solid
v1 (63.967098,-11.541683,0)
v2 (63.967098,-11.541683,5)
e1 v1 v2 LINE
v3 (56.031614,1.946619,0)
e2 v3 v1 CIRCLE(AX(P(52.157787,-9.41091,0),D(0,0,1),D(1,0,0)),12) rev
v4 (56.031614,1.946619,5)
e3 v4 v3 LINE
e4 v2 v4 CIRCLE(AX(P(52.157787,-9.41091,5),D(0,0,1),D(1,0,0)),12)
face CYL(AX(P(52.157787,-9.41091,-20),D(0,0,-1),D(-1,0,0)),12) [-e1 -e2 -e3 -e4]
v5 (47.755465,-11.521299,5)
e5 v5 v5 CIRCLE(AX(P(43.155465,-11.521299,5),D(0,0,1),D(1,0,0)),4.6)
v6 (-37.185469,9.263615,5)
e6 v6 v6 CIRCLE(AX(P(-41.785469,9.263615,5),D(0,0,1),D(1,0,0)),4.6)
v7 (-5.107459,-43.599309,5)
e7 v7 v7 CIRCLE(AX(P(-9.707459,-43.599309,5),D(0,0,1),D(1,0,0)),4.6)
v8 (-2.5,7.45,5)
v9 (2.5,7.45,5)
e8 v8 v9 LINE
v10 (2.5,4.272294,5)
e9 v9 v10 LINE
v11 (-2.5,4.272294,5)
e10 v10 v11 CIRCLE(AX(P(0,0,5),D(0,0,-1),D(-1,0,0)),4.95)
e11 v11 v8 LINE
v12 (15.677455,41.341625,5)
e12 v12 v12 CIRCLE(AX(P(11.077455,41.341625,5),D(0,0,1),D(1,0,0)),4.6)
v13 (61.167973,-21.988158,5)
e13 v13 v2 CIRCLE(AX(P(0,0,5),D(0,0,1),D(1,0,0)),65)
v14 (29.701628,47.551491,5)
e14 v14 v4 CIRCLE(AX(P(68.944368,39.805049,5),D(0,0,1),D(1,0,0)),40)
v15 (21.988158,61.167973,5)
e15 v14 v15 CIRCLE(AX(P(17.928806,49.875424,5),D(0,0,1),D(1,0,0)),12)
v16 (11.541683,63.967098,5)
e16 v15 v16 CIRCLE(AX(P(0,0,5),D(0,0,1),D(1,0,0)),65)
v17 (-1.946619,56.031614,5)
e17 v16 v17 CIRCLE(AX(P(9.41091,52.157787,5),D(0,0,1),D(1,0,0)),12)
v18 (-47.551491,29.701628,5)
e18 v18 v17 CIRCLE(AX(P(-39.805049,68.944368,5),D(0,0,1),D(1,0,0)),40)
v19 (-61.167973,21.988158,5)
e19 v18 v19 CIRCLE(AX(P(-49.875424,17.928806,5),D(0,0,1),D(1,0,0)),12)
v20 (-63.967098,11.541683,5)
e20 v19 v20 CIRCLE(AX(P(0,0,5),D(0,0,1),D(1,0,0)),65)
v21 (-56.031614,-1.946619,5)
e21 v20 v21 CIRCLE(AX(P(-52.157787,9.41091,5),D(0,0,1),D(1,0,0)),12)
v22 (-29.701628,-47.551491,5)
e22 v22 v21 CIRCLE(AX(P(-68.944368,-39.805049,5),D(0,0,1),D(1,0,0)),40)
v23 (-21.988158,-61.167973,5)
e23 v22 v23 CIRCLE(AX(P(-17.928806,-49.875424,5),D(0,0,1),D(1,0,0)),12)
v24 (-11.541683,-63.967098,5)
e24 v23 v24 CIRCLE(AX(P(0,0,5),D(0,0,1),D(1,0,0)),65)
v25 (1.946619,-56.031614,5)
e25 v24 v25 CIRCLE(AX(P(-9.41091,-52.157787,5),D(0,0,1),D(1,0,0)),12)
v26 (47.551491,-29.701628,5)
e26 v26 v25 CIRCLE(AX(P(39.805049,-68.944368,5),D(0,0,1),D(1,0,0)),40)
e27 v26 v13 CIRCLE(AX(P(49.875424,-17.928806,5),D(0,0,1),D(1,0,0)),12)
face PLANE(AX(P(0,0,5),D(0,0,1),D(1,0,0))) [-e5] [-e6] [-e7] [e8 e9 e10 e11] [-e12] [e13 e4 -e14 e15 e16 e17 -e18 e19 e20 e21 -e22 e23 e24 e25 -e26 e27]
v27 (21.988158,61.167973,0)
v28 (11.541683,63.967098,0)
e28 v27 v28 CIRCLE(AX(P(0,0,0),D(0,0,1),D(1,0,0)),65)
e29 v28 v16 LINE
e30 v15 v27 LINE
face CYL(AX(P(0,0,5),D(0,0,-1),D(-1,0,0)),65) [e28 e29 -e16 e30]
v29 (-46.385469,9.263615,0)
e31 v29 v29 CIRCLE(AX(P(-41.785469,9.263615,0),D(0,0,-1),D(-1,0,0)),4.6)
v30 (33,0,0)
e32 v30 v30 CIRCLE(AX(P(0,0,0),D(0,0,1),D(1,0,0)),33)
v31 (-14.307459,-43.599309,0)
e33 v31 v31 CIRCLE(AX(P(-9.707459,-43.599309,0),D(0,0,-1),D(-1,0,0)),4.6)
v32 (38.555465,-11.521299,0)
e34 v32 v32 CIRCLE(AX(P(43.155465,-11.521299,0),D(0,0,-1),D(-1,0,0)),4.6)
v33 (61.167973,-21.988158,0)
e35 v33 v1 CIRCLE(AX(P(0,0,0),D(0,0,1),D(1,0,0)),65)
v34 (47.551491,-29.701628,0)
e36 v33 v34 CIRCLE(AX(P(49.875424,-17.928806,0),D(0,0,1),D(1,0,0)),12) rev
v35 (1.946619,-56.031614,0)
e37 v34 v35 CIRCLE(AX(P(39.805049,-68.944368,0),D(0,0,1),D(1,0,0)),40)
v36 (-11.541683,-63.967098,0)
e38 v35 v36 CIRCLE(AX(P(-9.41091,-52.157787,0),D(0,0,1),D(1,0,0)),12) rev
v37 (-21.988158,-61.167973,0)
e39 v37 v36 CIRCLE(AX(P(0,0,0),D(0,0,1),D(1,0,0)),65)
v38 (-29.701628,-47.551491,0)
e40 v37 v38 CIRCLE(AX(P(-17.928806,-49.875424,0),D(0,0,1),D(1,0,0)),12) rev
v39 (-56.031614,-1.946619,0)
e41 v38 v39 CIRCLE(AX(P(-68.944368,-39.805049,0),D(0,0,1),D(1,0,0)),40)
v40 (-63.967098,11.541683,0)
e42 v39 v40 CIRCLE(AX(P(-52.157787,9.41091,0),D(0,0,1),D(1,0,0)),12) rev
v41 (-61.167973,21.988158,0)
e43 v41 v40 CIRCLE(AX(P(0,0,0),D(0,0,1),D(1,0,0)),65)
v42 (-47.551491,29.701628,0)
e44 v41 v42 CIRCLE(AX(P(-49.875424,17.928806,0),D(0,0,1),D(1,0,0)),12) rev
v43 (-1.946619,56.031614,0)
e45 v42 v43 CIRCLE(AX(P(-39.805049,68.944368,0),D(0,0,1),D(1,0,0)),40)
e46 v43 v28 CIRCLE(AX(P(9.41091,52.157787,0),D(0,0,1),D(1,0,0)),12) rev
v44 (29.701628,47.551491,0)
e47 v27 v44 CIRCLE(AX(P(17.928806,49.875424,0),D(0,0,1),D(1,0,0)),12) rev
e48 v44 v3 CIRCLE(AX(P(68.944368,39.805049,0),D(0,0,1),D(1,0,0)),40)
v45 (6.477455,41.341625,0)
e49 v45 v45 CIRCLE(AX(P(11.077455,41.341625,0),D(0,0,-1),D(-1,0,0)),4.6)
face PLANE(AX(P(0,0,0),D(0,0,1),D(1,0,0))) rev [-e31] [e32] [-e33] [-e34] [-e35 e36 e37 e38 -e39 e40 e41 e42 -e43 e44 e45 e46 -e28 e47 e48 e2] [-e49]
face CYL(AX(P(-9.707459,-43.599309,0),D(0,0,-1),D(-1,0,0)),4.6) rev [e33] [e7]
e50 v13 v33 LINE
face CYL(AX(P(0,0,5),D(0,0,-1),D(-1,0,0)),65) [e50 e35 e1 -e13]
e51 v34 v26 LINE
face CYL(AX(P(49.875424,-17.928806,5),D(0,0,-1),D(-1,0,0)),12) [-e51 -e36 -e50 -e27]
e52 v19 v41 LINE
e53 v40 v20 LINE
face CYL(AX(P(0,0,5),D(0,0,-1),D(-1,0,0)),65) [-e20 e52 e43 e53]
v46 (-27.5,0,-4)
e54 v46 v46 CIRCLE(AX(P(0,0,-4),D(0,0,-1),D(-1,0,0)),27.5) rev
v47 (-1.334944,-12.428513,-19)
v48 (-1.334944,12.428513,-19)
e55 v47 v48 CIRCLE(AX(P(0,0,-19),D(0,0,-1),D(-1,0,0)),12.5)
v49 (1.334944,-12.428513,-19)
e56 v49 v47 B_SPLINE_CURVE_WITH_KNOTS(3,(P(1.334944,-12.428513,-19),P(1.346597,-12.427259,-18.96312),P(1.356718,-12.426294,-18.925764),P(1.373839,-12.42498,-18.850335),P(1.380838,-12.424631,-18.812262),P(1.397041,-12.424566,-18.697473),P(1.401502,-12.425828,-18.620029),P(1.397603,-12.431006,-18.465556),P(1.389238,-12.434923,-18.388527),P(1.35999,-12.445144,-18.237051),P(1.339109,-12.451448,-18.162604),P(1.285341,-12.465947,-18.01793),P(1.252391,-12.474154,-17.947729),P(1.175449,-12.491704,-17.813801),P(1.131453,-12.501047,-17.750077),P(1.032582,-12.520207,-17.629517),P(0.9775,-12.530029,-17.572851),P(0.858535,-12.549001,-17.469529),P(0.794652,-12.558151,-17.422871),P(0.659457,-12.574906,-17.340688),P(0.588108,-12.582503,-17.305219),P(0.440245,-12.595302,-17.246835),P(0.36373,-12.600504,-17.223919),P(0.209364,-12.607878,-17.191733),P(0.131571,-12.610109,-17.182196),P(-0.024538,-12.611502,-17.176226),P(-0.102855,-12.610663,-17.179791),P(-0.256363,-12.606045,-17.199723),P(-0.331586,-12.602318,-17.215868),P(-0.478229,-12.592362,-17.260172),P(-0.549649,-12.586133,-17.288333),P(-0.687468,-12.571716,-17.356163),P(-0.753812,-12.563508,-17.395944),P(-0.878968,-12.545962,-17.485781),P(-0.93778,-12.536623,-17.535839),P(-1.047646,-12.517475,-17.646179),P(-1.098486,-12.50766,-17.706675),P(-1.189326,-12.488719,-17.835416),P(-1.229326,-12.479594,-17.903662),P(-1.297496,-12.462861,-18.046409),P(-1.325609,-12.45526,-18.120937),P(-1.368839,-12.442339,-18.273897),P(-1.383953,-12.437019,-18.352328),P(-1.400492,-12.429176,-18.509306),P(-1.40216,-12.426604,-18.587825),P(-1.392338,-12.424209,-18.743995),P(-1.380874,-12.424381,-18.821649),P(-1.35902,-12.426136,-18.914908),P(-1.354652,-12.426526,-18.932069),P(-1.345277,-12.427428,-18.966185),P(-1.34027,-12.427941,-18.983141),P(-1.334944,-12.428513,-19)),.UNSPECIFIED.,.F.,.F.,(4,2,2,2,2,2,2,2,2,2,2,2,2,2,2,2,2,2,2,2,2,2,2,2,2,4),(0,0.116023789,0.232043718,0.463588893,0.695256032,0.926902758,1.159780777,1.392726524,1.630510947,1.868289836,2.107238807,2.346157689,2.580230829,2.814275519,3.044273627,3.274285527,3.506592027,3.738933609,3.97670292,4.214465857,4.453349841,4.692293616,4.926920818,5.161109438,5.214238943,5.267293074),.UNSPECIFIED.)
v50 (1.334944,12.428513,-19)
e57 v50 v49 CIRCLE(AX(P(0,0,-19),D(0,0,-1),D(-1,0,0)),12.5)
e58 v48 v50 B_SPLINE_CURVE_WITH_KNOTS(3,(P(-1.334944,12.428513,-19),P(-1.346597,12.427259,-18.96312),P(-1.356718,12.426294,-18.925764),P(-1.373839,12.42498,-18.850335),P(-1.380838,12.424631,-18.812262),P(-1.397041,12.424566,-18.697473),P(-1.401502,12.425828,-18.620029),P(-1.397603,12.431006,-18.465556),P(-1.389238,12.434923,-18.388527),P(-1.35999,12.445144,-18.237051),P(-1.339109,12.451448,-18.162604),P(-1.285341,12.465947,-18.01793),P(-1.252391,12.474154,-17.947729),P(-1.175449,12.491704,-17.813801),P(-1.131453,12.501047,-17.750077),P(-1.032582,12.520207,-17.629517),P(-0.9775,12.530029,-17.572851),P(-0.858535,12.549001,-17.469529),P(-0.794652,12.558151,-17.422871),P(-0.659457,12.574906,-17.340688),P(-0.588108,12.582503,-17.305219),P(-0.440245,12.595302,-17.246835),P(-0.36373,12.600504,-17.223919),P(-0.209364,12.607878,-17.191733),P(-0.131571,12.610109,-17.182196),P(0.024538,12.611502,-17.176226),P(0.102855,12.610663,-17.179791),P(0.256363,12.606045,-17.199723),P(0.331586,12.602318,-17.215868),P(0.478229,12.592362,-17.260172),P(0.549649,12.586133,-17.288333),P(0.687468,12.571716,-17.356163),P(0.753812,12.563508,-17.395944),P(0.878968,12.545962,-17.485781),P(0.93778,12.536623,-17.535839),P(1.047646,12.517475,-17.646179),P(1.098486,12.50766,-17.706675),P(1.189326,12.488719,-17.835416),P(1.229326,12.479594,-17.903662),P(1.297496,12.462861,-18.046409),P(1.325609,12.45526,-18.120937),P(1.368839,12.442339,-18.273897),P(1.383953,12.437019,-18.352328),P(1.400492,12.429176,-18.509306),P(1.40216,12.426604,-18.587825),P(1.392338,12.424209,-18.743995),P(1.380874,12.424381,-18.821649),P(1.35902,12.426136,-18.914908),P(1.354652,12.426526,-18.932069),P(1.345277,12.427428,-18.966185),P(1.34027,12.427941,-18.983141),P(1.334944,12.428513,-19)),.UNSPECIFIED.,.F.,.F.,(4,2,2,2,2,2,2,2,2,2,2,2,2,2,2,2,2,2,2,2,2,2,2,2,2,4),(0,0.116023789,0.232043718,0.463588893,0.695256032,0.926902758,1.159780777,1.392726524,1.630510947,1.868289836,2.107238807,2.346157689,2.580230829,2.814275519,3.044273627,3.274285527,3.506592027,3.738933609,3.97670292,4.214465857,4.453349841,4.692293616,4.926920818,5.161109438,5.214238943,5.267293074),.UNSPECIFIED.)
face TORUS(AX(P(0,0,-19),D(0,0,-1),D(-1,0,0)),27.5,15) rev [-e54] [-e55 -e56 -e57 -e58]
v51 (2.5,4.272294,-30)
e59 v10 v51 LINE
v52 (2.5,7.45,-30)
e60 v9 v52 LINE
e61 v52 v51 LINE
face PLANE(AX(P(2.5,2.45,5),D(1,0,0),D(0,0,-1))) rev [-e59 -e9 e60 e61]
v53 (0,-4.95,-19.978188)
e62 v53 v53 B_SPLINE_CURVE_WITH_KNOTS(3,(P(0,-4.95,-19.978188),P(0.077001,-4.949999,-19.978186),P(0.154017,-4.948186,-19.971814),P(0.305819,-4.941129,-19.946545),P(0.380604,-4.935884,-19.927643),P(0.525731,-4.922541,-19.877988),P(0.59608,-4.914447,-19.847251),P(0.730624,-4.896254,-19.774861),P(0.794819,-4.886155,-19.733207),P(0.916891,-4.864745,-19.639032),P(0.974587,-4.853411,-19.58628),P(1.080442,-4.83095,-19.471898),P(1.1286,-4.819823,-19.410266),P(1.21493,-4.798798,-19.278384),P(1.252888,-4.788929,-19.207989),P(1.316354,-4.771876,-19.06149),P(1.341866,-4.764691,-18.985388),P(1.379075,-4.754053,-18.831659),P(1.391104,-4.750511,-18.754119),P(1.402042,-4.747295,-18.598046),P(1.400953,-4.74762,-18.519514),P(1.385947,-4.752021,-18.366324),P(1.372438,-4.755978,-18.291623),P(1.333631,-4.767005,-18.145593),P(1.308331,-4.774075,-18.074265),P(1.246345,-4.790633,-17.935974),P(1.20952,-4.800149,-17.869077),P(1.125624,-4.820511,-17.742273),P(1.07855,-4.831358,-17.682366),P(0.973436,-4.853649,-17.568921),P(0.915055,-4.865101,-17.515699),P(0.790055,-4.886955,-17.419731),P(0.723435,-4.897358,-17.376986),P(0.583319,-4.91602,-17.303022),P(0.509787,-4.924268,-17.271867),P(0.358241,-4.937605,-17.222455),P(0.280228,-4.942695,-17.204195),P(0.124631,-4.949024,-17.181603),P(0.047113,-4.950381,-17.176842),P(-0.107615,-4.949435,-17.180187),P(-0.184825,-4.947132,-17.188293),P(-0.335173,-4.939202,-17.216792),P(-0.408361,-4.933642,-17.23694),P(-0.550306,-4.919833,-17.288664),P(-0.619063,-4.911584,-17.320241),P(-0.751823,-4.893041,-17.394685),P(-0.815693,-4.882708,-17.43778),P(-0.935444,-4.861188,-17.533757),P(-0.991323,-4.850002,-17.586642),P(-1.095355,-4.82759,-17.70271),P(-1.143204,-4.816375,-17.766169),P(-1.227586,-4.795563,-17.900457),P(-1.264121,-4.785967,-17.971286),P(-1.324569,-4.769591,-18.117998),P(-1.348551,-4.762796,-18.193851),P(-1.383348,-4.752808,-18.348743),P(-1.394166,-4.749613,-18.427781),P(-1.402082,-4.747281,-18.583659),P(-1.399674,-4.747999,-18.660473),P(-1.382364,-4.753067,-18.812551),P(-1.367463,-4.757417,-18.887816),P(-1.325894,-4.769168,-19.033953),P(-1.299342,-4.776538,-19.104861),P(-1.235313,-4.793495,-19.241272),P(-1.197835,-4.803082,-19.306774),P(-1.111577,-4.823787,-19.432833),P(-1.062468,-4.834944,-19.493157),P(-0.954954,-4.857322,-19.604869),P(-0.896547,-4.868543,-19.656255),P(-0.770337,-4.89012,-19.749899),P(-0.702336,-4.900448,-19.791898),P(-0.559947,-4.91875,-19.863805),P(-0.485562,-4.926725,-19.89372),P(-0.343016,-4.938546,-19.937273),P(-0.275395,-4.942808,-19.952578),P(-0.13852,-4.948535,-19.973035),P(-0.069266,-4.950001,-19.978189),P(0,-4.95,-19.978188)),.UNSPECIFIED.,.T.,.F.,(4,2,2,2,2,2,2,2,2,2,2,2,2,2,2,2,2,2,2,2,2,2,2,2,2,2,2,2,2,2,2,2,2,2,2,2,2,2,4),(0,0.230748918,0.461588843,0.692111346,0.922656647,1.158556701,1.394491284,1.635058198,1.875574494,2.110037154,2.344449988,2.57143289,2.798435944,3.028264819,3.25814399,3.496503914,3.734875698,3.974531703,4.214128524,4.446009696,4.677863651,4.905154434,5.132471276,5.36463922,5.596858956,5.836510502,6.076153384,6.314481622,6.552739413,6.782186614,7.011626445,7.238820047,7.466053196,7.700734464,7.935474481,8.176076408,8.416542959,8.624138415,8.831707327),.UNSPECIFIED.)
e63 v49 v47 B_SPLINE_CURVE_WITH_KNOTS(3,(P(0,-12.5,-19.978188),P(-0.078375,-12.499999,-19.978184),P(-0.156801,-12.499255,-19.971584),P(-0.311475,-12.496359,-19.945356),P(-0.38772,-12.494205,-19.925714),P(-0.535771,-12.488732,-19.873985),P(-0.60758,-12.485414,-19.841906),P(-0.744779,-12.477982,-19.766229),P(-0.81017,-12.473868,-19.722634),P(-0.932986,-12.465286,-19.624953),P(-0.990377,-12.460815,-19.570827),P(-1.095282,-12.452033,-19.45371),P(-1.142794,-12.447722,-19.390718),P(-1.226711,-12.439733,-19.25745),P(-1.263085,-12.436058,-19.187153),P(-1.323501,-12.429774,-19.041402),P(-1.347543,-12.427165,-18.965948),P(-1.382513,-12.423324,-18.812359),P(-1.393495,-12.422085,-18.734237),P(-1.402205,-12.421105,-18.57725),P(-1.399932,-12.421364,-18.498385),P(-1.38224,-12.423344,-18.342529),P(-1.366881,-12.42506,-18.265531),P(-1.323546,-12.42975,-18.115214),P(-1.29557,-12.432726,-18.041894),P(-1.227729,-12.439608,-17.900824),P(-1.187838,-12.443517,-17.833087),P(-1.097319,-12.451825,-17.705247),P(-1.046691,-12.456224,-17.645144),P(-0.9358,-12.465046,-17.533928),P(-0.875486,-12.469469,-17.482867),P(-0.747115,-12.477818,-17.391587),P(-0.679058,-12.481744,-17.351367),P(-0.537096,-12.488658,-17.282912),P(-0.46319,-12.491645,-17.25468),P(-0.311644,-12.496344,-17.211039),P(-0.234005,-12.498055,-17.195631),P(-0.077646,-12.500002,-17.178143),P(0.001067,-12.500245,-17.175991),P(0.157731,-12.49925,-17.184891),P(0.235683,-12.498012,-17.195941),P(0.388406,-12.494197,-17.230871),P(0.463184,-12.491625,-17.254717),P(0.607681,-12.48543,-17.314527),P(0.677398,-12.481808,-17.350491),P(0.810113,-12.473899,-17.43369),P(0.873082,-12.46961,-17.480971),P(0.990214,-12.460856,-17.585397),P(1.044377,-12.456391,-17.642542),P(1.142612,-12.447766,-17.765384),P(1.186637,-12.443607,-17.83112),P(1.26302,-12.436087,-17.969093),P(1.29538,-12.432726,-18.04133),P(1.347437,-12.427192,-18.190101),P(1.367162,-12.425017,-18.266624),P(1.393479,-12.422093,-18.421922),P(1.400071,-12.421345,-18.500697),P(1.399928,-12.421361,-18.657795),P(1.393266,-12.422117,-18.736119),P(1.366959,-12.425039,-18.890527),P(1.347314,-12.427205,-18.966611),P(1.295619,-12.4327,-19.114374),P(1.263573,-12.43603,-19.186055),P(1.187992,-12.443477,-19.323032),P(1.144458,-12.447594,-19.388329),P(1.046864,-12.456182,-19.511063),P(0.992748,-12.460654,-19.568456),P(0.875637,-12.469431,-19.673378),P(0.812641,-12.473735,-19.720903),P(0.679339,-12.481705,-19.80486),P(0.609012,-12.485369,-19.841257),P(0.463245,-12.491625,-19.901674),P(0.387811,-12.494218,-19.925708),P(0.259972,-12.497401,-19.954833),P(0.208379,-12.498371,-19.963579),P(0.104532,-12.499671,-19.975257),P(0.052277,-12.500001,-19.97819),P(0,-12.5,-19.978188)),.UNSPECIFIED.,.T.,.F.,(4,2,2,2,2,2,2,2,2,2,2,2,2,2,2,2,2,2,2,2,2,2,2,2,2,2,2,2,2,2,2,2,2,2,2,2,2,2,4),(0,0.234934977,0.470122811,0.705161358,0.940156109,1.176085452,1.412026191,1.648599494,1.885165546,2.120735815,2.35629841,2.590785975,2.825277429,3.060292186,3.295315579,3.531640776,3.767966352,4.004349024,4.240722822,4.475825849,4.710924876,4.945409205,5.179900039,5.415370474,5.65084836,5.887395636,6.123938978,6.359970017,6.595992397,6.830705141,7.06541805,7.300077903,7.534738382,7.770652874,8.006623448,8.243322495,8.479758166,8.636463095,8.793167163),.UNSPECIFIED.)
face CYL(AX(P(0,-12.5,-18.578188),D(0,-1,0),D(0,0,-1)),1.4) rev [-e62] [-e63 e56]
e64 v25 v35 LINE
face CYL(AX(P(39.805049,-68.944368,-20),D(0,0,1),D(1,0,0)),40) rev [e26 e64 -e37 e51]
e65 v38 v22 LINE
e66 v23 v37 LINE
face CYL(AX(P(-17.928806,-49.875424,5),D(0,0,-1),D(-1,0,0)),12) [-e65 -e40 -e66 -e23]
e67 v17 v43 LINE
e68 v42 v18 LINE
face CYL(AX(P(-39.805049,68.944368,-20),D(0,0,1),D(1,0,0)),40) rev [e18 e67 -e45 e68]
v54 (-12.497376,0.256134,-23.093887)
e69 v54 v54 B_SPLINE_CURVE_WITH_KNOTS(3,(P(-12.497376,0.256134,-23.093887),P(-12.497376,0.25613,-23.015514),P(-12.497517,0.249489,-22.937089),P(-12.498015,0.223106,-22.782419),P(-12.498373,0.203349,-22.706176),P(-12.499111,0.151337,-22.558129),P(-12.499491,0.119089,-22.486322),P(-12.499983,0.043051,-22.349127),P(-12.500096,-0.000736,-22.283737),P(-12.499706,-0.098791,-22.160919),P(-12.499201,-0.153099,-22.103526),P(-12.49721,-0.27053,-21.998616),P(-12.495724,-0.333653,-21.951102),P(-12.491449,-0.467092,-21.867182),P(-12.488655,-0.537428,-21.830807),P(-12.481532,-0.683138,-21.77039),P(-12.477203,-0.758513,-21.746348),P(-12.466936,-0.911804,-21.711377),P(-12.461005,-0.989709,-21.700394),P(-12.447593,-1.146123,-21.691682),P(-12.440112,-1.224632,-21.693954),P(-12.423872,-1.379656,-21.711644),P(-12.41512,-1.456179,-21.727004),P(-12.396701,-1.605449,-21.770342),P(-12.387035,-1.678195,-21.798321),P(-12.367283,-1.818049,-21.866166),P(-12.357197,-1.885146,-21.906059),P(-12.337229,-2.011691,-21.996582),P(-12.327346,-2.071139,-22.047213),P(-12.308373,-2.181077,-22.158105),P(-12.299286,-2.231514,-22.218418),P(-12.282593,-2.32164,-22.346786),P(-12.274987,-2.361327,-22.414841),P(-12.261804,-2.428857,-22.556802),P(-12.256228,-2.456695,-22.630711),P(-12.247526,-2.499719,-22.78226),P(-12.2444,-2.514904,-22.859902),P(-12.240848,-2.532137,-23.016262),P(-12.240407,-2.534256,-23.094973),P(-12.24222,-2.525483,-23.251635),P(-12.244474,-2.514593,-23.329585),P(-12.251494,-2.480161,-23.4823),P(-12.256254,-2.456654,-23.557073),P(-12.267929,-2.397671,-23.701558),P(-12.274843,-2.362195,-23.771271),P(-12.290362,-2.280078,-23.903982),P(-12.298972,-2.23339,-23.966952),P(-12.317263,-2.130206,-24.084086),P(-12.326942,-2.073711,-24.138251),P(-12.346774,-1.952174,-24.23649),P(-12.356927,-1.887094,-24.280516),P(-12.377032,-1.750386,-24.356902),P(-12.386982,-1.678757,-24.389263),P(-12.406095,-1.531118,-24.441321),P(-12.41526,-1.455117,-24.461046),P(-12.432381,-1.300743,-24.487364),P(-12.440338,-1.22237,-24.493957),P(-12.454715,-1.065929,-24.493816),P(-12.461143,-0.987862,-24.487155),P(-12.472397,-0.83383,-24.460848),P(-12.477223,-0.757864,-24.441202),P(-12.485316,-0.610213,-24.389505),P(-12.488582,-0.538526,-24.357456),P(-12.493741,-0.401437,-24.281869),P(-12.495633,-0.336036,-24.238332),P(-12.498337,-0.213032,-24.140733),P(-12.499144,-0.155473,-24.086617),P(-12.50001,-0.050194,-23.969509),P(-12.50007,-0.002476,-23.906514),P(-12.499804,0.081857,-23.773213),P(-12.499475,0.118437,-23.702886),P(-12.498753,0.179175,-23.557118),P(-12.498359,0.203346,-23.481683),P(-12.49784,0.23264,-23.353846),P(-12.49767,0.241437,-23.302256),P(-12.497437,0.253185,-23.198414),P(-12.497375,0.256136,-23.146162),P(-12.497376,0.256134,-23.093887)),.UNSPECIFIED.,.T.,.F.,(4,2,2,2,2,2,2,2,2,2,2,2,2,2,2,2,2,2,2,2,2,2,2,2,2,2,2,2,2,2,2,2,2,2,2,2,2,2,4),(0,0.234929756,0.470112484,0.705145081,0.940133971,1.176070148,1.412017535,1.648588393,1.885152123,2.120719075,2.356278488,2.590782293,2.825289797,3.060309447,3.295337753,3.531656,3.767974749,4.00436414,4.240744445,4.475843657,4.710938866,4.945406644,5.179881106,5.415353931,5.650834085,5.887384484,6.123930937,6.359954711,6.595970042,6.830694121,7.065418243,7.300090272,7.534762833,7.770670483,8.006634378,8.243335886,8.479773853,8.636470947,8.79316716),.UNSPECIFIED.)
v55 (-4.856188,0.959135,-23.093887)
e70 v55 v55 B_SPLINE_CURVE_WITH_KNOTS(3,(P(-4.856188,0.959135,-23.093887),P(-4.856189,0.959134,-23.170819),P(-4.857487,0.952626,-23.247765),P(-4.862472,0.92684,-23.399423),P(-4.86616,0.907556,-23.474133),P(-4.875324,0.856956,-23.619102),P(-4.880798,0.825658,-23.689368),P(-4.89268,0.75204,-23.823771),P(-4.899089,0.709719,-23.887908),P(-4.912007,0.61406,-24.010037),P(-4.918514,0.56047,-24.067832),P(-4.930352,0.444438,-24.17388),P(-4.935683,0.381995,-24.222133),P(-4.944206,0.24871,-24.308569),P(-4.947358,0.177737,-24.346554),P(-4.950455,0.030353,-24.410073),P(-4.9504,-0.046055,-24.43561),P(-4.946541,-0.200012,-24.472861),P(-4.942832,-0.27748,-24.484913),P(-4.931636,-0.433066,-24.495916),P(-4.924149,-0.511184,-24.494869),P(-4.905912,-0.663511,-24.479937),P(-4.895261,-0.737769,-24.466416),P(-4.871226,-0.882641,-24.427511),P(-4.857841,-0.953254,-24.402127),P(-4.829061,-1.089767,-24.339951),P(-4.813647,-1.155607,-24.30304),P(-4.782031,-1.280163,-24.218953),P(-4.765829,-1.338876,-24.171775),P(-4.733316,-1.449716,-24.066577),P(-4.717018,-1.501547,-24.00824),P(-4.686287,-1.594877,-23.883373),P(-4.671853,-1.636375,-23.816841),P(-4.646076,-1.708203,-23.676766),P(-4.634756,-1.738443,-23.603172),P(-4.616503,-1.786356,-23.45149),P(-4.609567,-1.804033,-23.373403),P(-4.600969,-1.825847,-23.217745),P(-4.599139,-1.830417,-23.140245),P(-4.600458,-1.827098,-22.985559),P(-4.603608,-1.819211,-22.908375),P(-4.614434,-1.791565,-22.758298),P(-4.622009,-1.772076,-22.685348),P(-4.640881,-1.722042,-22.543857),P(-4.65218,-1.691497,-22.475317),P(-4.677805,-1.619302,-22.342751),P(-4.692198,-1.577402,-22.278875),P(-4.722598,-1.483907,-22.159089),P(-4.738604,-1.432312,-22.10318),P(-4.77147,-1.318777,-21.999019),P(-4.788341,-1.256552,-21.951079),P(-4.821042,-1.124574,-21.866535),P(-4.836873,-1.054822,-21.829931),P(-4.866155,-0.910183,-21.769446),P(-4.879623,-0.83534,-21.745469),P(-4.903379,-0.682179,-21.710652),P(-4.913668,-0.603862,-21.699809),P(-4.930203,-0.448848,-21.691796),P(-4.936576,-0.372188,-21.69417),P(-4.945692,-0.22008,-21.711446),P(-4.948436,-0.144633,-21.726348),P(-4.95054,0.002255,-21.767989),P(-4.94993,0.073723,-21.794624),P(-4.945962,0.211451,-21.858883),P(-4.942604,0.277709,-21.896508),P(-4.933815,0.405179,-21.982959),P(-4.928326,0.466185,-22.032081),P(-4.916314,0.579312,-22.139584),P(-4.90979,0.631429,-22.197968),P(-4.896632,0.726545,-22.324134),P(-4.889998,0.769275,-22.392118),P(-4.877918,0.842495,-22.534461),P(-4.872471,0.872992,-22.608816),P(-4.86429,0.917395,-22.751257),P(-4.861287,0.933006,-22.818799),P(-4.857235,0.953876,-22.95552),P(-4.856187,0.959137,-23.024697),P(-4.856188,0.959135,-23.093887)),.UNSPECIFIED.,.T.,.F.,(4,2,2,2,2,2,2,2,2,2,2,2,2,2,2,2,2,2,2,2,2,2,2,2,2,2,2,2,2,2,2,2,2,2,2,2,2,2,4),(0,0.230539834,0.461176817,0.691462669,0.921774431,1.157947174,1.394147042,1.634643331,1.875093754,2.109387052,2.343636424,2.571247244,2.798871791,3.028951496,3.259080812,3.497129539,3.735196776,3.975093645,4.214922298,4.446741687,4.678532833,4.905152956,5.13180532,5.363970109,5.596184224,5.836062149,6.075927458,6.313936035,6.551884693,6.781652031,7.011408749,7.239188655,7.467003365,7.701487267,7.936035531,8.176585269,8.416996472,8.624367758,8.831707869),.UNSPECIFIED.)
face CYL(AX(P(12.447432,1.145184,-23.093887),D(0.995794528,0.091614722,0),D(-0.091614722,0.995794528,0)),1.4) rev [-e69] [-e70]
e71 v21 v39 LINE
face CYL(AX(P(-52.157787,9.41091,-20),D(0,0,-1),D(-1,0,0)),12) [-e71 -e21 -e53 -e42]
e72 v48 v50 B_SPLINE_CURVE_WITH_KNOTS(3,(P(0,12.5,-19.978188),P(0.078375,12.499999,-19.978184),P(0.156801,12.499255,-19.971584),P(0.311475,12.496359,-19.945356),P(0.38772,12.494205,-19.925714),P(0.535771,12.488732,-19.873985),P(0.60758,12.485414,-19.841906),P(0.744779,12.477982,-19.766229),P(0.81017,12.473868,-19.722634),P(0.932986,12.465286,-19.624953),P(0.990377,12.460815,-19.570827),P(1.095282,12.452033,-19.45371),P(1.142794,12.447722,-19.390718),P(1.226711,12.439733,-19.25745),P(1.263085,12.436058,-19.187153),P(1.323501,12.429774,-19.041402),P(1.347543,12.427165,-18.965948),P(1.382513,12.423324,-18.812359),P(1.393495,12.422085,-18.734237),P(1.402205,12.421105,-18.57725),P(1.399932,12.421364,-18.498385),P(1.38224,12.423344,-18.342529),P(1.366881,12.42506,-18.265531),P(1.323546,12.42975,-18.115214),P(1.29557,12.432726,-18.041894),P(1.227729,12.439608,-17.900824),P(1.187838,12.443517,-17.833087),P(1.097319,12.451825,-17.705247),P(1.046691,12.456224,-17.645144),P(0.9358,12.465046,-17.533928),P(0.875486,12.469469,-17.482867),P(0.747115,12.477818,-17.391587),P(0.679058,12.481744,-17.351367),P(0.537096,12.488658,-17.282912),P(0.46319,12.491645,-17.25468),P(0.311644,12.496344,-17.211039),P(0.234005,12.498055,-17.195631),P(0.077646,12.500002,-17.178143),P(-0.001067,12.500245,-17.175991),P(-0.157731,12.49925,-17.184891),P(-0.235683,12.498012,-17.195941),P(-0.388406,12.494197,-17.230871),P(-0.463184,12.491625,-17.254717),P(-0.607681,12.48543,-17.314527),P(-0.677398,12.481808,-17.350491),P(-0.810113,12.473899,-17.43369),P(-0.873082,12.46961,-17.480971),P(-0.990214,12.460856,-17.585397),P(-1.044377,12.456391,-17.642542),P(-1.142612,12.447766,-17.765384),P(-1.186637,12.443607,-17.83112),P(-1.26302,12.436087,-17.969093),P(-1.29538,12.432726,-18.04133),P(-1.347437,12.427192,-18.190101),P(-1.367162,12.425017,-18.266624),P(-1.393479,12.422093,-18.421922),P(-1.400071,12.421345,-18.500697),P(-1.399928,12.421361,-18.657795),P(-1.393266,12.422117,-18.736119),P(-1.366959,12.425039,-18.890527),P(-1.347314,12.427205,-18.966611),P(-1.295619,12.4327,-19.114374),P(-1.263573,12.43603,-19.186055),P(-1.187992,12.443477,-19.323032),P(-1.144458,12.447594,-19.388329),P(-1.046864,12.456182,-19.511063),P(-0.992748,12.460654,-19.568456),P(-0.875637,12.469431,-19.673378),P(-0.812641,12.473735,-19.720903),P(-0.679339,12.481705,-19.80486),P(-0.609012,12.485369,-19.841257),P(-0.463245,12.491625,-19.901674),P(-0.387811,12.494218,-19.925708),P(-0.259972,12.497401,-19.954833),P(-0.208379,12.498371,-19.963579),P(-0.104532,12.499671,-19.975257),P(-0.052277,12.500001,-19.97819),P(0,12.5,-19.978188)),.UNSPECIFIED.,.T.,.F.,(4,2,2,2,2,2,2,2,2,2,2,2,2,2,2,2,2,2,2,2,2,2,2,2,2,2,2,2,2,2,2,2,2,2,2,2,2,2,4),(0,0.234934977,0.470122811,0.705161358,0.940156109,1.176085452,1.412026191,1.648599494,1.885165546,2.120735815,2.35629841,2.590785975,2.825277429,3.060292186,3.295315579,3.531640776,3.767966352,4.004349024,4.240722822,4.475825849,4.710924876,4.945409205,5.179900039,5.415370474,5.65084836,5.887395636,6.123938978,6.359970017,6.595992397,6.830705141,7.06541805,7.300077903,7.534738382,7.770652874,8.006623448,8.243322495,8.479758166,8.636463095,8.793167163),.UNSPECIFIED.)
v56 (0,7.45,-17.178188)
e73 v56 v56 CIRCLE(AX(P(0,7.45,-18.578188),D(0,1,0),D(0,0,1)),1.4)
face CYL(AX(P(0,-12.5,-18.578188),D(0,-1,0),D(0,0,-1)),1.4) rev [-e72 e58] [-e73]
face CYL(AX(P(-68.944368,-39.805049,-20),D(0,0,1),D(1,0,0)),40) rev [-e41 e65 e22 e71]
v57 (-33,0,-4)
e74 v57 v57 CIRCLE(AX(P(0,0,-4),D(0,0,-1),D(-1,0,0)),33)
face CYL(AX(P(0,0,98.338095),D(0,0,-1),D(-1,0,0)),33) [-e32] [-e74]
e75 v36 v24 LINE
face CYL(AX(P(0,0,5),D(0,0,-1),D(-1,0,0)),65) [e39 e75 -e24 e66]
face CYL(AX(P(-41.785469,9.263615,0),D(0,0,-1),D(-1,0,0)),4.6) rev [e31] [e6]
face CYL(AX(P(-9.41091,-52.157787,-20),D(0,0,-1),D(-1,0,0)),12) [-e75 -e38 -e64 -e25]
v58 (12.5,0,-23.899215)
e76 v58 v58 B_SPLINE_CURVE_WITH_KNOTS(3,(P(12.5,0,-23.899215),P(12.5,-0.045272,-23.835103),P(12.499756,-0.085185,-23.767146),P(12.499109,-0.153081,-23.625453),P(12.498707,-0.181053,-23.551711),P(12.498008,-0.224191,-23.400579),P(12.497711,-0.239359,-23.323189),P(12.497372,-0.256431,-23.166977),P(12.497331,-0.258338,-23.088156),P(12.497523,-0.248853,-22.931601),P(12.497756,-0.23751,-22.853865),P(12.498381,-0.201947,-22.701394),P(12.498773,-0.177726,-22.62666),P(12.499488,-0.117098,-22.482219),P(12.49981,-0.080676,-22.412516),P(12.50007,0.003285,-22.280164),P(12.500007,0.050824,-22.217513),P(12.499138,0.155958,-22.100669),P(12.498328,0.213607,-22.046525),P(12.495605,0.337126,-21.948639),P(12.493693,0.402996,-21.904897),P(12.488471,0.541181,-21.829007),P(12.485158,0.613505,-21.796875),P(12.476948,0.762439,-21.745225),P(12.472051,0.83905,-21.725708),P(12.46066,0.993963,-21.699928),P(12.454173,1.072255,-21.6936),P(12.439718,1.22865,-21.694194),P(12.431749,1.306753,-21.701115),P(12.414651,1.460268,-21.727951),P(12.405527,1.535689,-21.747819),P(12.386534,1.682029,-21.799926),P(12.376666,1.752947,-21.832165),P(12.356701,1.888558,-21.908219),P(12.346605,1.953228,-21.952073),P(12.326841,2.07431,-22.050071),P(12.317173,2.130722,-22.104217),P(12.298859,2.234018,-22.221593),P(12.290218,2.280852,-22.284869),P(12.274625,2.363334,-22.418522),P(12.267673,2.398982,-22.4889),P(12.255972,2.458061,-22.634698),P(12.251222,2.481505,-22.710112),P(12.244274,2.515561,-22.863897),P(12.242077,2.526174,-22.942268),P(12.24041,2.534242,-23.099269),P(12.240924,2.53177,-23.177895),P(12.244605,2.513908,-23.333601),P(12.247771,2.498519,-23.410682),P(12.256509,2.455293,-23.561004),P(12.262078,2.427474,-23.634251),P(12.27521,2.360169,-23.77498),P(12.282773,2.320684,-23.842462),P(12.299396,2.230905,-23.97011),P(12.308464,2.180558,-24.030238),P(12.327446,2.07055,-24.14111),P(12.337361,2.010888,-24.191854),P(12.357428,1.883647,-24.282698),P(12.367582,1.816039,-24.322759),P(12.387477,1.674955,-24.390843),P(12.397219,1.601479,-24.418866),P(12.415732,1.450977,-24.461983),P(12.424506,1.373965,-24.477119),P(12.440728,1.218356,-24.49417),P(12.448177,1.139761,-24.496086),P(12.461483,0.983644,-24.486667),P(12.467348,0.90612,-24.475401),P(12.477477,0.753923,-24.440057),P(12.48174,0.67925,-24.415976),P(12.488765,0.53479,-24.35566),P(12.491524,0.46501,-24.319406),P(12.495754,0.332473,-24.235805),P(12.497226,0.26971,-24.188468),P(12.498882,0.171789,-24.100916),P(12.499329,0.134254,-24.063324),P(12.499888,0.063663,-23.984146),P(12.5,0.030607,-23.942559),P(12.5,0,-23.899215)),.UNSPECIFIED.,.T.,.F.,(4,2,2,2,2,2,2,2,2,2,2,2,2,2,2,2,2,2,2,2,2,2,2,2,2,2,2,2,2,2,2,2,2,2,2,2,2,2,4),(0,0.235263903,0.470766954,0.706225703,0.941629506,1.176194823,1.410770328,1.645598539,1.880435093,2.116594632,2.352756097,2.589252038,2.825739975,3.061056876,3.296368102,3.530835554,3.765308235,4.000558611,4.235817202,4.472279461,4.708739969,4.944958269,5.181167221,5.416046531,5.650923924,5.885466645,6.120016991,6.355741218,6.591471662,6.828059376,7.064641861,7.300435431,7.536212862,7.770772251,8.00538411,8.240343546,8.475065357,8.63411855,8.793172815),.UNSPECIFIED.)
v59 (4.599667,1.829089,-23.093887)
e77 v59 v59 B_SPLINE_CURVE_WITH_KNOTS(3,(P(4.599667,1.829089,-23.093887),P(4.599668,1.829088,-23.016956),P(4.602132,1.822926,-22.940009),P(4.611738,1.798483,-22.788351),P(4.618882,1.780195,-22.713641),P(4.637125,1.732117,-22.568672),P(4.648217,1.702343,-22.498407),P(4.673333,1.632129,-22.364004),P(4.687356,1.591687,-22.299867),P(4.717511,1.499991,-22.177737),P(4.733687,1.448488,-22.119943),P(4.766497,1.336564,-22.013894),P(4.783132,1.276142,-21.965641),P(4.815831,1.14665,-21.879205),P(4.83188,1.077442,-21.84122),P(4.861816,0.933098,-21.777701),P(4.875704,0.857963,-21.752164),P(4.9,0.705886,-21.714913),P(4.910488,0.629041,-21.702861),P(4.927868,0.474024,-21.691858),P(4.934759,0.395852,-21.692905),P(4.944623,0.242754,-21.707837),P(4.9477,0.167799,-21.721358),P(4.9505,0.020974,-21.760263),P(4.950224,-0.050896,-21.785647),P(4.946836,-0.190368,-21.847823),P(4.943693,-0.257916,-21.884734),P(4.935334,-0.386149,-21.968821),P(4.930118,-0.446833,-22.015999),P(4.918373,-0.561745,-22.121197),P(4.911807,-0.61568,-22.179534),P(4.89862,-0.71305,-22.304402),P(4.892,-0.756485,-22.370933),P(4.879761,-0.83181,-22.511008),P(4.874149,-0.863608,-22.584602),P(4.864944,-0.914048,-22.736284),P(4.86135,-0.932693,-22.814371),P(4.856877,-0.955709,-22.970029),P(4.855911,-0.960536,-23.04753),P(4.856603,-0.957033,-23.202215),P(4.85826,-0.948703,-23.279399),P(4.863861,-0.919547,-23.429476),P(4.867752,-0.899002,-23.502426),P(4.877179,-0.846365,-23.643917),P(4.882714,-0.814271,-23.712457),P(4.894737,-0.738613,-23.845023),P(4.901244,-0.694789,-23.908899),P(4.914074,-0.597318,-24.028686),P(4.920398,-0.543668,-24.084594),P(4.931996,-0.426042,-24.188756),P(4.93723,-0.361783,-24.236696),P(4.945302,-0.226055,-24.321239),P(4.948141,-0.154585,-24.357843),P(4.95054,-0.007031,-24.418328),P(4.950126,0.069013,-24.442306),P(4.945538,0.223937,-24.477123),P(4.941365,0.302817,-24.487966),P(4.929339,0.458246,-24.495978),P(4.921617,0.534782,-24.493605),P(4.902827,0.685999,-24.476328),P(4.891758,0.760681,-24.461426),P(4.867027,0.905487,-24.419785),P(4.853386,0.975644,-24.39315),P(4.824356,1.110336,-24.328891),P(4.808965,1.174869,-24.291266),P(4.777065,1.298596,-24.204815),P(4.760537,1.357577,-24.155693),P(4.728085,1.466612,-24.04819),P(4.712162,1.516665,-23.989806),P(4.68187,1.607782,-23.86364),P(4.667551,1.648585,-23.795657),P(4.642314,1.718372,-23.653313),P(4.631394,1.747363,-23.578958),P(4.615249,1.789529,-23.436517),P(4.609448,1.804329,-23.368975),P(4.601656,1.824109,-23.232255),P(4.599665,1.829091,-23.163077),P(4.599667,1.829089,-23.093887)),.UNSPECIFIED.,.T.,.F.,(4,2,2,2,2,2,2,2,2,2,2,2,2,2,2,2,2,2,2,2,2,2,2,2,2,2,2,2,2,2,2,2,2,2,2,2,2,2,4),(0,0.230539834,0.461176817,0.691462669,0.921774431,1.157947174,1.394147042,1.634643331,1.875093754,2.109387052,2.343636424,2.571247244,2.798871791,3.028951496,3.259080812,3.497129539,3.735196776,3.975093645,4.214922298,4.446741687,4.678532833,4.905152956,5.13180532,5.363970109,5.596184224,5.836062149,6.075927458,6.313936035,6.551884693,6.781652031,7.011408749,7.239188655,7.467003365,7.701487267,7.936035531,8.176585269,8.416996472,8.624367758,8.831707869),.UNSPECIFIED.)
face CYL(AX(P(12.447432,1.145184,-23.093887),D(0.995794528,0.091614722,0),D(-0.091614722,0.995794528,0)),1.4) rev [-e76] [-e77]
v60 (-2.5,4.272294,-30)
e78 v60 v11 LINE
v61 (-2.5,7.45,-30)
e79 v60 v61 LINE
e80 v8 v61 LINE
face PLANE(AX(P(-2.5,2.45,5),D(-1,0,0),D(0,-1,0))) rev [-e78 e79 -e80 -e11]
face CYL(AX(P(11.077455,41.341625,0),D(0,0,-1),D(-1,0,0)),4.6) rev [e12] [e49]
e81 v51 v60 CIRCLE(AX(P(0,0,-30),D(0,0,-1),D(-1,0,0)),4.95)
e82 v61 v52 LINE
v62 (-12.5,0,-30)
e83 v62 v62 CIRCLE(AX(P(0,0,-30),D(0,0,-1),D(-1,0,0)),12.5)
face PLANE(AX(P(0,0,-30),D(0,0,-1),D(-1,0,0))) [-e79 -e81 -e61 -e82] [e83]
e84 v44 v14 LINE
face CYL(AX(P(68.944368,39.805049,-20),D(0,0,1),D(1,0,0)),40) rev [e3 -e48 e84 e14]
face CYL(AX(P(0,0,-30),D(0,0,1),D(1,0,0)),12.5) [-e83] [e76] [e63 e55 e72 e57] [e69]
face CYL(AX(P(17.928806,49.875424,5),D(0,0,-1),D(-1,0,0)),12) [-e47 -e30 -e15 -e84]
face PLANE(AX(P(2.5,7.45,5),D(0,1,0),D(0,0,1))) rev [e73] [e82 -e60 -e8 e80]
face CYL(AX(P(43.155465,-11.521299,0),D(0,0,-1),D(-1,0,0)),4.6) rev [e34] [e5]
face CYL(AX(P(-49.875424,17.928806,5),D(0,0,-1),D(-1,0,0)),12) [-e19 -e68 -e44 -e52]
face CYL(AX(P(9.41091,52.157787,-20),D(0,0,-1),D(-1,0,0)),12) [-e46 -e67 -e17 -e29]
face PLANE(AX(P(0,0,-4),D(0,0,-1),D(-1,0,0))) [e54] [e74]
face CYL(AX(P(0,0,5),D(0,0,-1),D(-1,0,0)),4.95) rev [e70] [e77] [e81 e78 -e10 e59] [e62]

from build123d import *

# Parameters (mm, degrees)
SKETCH1_R                           = 65
BOSS_EXTRUDE1_DEPTH                 = 5
CUT_EXTRUDE2_START                  = -25
CUT_EXTRUDE2_DEPTH                  = 25
FILLET2_R                           = 12
SKETCH9_R                           = 12.5
BOSS_EXTRUDE4_DEPTH                 = 30
SKETCH10_R                          = 4.95
CUT_EXTRUDE3_DEPTH                  = 98.249387408
SKETCH11_W                          = 5
SKETCH11_H                          = 5
CUT_EXTRUDE4_DEPTH                  = 98.249387408
F_1_0MM_DOWEL_HOLE3_D               = 2.8
F_1_0MM_DOWEL_HOLE3_DEPTH           = 33.158795133
F_1_0MM_DOWEL_HOLE3_TIP             = 0.841204867
F_1_0MM_DOWEL_HOLE3_ON_FACE_2_D     = 2.8
F_1_0MM_DOWEL_HOLE3_ON_FACE_2_DEPTH = 33.158795133
F_1_0MM_DOWEL_HOLE3_ON_FACE_2_TIP   = 0.841204867
BOSS_EXTRUDE5_DEPTH                 = 4
BOSS_EXTRUDE5_DEPTH_BACK            = 5
SKETCH13_R                          = 33
F_1_0MM_DOWEL_HOLE4_D               = 9.2
F_1_0MM_DOWEL_HOLE4_DEPTH           = 31.236041152
F_1_0MM_DOWEL_HOLE4_TIP             = 2.763958848
FILLET4_R                           = 15
CUT_EXTRUDE5_DEPTH                  = 98.249387408


with BuildPart() as part:
    # Sketch1 → Boss-Extrude1 (new body)
    with BuildSketch(Plane.XY):
        Circle(SKETCH1_R)
    extrude(amount=BOSS_EXTRUDE1_DEPTH)

    # Sketch6 → Cut-Extrude2 (cut)
    with BuildSketch(Plane.XY.offset(5).offset(CUT_EXTRUDE2_START)):
        with BuildLine():
            ThreePointArc((-65, 0), (-56.291651246, -32.5), (-32.5, -56.291651246))
            ThreePointArc((-32.5, -56.291651246), (-34.303351875, -19.805049439), (-65, 0))
        make_face()
        with BuildLine():
            ThreePointArc((56.291651246, -32.5), (19.805049439, -34.303351875), (0, -65))
            ThreePointArc((0, -65), (32.5, -56.291651246), (56.291651246, -32.5))
        make_face()
        with BuildLine():
            ThreePointArc((0, 65), (-32.5, 56.291651246), (-56.291651246, 32.5))
            ThreePointArc((-56.291651246, 32.5), (-19.805049439, 34.303351875), (0, 65))
        make_face()
        with BuildLine():
            ThreePointArc((32.5, 56.291651246), (34.303351875, 19.805049439), (65, 0))
            ThreePointArc((65, 0), (56.291651246, 32.5), (32.5, 56.291651246))
        make_face()
    extrude(amount=CUT_EXTRUDE2_DEPTH, mode=Mode.SUBTRACT)

    # Fillet2
    fillet2_edges = [part.edges().sort_by_distance(p)[0] for p in [
        (-56.291651246, 32.5, 2.5),
        (0, 65, 2.5),
        (32.5, 56.291651246, 2.5),
        (65, 0, 2.5),
        (-32.5, -56.291651246, 2.5),
        (-65, 0, 2.5),
        (56.291651246, -32.5, 2.5),
        (0, -65, 2.5),
    ]]
    fillet(fillet2_edges, radius=FILLET2_R)

    # Sketch9 → Boss-Extrude4 (add)
    with BuildSketch(Plane(origin=(0, 0, 0), x_dir=(-1, 0, 0), z_dir=(0, 0, -1))):
        Circle(SKETCH9_R)
    extrude(amount=BOSS_EXTRUDE4_DEPTH)

    # Sketch10 → Cut-Extrude3 (cut, through all)
    with BuildSketch(Plane(origin=(0, 0, -30), x_dir=(-1, 0, 0), z_dir=(0, 0, -1))):
        Circle(SKETCH10_R)
    extrude(amount=-CUT_EXTRUDE3_DEPTH, mode=Mode.SUBTRACT)

    # Sketch11 → Cut-Extrude4 (cut, through all)
    with BuildSketch(Plane(origin=(0, 0, -30), x_dir=(-1, 0, 0), z_dir=(0, 0, -1))):
        with Locations((0, 4.95)):
            Rectangle(SKETCH11_W, SKETCH11_H)
    extrude(amount=-CUT_EXTRUDE4_DEPTH, mode=Mode.SUBTRACT)

    # Ø1.0mm Dowel Hole3
    with Locations(Plane(origin=(0, -12.5, -18.578187756), x_dir=(-1, 0, 0), z_dir=(0, -1, 0))):
        with Locations((0, 0)):
            Hole(F_1_0MM_DOWEL_HOLE3_D / 2, depth=F_1_0MM_DOWEL_HOLE3_DEPTH)
            with Locations((0, 0, -(F_1_0MM_DOWEL_HOLE3_DEPTH + F_1_0MM_DOWEL_HOLE3_TIP / 2))):  # 118° drill point
                Cone(0, F_1_0MM_DOWEL_HOLE3_D / 2, F_1_0MM_DOWEL_HOLE3_TIP, mode=Mode.SUBTRACT)

    # Ø1.0mm Dowel Hole3 on face 2
    with Locations(Plane(origin=(12.447431605, 1.14518402, -23.093887112), x_dir=(-0.091614954639, 0.995794506957, 0), z_dir=(0.995794506957, 0.091614954639, 0))):
        with Locations((0, 0)):
            Hole(F_1_0MM_DOWEL_HOLE3_ON_FACE_2_D / 2, depth=F_1_0MM_DOWEL_HOLE3_ON_FACE_2_DEPTH)
            with Locations((0, 0, -(F_1_0MM_DOWEL_HOLE3_ON_FACE_2_DEPTH + F_1_0MM_DOWEL_HOLE3_ON_FACE_2_TIP / 2))):  # 118° drill point
                Cone(0, F_1_0MM_DOWEL_HOLE3_ON_FACE_2_D / 2, F_1_0MM_DOWEL_HOLE3_ON_FACE_2_TIP, mode=Mode.SUBTRACT)

    # Sketch13 → Boss-Extrude5 (add, two sides: drawn at the far end of the back side and taken through both)
    with BuildSketch(Plane(origin=(0, 0, 0), x_dir=(-1, 0, 0), z_dir=(0, 0, -1)).offset(-BOSS_EXTRUDE5_DEPTH_BACK)):
        Circle(SKETCH13_R)
    extrude(amount=BOSS_EXTRUDE5_DEPTH + BOSS_EXTRUDE5_DEPTH_BACK)

    # Ø1.0mm Dowel Hole4
    with Locations(Plane(origin=(11.07745513, 41.341625365, 0), x_dir=(-1, 0, 0), z_dir=(0, 0, -1))):
        with Locations((0, 0), (20.784914346, -84.940934124), (52.862924235, -32.078009888), (-32.078009889, -52.862924235)):
            Hole(F_1_0MM_DOWEL_HOLE4_D / 2, depth=F_1_0MM_DOWEL_HOLE4_DEPTH)
            with Locations((0, 0, -(F_1_0MM_DOWEL_HOLE4_DEPTH + F_1_0MM_DOWEL_HOLE4_TIP / 2))):  # 118° drill point
                Cone(0, F_1_0MM_DOWEL_HOLE4_D / 2, F_1_0MM_DOWEL_HOLE4_TIP, mode=Mode.SUBTRACT)

    # Fillet4
    # the kernel refuses this fillet: 15 mm, written as the material it adds along each edge
    with BuildSketch(Plane(origin=(0, 0, -4), x_dir=(-1, 0, 0), z_dir=(0, 1, 0))) as fillet4_piece_1_section:
        with BuildLine():
            CenterArc((12.5 + FILLET4_R, -FILLET4_R), FILLET4_R, 90, 90)
            Line((12.5, -FILLET4_R), (12.5, 0))
            Line((12.5, 0), (12.5 + FILLET4_R, 0))
        make_face()
    fillet4_piece_1 = revolve(axis=Axis((0, 0, -4), (0, 0, 1)), mode=Mode.PRIVATE)
    fillet4_piece_1 = fillet4_piece_1 - Plane(origin=(0, 0, -18.578187756), x_dir=(1, 0, 0), z_dir=(0, 1, 0)) * Cylinder(1.4, 110, mode=Mode.PRIVATE)
    add(fillet4_piece_1)

    # Sketch17 → Cut-Extrude5 (cut, through all)
    with BuildSketch(Plane(origin=(0, 0, -30), x_dir=(-1, 0, 0), z_dir=(0, 0, -1))):
        with BuildLine():
            Line((2.5, 4.272294466), (2.5, 7.45))
            Line((2.5, 7.45), (-2.5, 7.45))
            Line((-2.5, 7.45), (-2.5, 4.272294466))
            ThreePointArc((-2.5, 4.272294466), (0, -4.95), (2.5, 4.272294466))
        make_face()
    extrude(amount=-CUT_EXTRUDE5_DEPTH, mode=Mode.SUBTRACT)


solid = part.part
